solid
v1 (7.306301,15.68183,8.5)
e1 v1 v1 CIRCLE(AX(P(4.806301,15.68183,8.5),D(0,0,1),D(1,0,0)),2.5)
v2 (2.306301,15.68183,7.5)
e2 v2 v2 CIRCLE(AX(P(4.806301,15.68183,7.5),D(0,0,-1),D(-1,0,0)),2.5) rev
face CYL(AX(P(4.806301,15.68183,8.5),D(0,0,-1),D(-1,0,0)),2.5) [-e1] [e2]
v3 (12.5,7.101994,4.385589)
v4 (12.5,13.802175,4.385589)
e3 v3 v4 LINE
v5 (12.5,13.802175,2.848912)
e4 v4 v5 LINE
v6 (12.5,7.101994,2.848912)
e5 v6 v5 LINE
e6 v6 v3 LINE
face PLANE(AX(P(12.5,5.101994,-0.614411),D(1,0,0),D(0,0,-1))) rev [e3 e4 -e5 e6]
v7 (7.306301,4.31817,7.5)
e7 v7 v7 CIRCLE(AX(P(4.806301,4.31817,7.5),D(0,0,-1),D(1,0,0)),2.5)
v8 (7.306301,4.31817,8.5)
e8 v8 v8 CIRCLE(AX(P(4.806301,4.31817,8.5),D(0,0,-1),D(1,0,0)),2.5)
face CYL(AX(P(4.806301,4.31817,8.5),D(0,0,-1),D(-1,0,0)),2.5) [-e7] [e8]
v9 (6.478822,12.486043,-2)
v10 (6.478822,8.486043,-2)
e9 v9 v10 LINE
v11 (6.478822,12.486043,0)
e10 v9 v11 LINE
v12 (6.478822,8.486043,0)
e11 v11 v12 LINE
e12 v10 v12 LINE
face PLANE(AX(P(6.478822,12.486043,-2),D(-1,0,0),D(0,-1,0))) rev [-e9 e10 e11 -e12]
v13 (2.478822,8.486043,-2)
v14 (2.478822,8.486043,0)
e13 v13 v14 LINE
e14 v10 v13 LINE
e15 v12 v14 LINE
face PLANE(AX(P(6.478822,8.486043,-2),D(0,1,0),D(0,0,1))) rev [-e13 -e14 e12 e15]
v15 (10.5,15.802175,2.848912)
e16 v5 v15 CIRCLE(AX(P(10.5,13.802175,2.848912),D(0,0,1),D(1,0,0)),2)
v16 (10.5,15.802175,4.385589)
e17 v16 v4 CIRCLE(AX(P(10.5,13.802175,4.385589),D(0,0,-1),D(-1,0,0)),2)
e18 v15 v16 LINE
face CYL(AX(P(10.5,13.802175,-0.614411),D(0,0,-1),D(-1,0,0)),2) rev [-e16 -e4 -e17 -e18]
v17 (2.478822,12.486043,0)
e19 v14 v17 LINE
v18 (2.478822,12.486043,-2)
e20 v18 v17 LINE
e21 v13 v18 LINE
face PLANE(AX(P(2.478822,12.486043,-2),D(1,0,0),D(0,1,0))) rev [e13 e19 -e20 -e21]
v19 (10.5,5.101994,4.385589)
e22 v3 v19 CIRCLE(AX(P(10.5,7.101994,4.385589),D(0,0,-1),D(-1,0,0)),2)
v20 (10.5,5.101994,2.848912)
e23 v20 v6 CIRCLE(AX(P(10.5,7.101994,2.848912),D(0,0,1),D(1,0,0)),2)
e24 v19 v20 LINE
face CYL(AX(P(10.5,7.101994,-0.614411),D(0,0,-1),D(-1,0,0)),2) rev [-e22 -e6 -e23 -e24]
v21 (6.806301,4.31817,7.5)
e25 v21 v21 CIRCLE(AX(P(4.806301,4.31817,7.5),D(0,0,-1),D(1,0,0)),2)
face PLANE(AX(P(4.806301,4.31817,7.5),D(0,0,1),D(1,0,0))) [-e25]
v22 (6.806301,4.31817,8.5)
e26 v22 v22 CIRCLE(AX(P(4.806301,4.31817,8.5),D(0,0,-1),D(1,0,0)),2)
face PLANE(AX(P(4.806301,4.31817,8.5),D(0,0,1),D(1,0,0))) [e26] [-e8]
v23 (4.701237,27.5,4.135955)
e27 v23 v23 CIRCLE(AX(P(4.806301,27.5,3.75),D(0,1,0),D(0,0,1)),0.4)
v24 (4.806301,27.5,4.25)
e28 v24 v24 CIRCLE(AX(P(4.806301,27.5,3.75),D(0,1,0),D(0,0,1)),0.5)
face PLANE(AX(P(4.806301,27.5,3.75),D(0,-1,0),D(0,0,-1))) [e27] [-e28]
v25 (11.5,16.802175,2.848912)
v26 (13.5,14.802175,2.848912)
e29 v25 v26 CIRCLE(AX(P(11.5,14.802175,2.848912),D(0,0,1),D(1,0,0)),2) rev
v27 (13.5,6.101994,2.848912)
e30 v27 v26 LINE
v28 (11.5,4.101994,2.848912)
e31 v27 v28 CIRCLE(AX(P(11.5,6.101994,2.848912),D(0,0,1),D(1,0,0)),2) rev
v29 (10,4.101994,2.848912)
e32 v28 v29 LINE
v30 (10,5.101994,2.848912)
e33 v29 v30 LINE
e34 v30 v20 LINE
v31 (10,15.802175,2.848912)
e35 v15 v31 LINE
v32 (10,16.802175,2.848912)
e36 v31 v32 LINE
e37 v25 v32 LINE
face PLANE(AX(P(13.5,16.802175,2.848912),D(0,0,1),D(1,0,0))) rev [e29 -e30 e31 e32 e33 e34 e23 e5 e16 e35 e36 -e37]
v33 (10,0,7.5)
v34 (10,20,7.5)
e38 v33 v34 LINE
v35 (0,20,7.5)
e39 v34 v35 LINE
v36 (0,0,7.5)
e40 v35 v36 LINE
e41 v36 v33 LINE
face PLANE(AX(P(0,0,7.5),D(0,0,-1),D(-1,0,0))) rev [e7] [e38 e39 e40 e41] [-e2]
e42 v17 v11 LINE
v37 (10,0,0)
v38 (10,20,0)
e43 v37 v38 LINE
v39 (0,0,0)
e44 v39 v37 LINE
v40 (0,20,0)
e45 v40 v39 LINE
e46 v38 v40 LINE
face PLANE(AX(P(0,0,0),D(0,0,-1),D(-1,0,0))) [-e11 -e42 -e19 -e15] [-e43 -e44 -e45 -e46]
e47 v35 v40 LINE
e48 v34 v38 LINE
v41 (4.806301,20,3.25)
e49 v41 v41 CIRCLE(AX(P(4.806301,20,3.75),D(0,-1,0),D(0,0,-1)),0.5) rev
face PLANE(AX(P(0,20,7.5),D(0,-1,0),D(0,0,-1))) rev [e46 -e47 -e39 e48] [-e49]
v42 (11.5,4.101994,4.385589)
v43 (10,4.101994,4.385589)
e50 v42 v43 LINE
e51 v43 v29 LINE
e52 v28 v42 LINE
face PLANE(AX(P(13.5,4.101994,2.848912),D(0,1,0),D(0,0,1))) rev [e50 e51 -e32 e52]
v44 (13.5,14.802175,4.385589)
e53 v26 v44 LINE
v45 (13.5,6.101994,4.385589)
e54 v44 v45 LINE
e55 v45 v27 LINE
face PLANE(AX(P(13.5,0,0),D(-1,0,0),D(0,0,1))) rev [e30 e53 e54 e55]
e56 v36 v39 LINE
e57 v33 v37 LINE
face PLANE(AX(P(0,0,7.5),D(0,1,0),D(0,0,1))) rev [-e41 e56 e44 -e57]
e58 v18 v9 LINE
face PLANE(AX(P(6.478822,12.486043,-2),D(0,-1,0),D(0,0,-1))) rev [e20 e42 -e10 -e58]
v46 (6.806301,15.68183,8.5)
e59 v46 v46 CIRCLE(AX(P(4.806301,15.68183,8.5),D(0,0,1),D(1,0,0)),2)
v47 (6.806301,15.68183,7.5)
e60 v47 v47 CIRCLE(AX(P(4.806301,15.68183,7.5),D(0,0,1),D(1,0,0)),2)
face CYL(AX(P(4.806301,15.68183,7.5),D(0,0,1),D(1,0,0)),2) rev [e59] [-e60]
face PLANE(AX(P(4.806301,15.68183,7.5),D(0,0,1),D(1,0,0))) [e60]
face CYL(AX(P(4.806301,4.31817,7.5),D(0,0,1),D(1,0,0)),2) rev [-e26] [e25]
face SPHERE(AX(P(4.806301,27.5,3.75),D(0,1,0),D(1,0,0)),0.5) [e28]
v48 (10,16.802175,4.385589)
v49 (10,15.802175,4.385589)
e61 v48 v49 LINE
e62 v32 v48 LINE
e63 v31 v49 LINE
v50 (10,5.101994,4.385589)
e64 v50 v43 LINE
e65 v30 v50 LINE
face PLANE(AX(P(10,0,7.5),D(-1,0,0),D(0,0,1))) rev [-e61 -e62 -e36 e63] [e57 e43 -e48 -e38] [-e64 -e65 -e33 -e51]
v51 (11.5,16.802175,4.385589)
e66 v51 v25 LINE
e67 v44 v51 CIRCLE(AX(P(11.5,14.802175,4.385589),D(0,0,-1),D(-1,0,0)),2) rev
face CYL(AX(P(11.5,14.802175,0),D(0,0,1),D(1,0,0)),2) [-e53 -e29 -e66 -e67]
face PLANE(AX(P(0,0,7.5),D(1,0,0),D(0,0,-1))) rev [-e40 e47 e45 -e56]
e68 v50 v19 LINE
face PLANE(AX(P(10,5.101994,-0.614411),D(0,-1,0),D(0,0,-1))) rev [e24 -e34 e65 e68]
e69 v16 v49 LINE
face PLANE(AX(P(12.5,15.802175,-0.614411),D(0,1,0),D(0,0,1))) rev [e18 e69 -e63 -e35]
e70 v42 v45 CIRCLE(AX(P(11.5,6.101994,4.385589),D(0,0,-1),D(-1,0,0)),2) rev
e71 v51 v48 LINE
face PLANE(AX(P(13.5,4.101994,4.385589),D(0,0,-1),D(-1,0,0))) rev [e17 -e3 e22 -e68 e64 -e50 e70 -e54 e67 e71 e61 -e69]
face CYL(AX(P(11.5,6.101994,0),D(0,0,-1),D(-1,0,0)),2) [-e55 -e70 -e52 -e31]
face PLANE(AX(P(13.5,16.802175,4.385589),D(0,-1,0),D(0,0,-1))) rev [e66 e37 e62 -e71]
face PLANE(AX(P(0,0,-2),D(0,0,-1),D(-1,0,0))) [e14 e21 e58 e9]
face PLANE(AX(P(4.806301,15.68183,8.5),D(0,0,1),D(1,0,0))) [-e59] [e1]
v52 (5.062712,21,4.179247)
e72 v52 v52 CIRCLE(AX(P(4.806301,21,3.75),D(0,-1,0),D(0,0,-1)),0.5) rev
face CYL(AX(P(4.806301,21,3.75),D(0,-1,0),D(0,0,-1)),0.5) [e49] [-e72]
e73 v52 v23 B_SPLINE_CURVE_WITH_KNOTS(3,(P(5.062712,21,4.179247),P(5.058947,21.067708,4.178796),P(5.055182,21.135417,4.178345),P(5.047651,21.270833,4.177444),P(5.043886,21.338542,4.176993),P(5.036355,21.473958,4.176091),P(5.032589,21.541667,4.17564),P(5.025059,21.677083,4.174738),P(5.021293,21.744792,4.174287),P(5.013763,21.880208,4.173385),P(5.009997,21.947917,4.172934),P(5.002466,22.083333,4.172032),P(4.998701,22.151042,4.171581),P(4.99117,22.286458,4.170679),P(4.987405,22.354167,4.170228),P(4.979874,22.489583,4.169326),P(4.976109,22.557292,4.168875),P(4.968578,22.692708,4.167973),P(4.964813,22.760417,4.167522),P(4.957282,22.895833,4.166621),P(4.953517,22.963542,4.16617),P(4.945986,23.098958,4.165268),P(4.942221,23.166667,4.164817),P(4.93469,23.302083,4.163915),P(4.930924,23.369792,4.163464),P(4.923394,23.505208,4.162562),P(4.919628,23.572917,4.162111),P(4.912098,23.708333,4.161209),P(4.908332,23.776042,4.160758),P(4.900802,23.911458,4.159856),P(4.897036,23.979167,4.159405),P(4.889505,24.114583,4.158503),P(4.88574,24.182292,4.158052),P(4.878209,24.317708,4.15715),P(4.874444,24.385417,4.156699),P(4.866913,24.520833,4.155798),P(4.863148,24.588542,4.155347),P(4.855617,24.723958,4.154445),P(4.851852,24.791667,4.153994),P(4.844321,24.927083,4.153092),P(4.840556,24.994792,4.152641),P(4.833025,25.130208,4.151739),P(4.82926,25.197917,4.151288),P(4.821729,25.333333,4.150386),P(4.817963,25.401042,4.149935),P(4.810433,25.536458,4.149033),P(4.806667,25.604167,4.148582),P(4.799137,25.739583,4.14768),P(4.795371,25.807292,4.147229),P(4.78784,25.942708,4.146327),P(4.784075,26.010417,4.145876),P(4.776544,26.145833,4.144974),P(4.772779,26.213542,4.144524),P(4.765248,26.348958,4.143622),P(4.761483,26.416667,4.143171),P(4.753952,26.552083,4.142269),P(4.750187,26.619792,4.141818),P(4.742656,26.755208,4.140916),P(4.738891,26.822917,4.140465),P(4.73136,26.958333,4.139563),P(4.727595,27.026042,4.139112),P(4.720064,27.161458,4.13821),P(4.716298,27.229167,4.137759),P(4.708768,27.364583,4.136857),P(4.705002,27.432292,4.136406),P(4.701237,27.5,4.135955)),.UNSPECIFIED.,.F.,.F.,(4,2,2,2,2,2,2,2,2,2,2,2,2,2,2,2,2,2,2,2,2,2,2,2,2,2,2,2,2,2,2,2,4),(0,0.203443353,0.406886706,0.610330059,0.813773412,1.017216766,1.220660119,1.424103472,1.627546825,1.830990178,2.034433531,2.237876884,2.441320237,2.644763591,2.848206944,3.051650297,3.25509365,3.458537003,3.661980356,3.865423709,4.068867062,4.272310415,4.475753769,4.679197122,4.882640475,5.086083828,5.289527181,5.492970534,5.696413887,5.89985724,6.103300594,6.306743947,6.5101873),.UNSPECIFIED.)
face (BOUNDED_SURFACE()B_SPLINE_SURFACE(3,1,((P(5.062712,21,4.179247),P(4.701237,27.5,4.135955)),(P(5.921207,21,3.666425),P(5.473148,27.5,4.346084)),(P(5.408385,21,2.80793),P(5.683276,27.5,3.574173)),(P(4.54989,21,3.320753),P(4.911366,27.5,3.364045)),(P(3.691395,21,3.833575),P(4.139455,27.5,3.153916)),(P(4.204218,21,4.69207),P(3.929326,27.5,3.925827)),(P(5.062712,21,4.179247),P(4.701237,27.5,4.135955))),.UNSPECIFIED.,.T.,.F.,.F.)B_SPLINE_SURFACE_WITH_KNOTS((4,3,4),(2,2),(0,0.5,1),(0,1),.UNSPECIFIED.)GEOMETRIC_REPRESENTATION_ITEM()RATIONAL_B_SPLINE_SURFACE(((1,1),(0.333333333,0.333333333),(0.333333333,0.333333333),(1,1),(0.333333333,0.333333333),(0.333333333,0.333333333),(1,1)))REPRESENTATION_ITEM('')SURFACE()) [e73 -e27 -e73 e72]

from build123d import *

# Parameters (mm, degrees)
SKETCH1_W           = 10
SKETCH1_H           = 20
BOSS_EXTRUDE1_DEPTH = 7.5
SKETCH2_R           = 2.5
BOSS_EXTRUDE2_DEPTH = 1
SKETCH3_R           = 2
CUT_EXTRUDE1_DEPTH  = 1
SKETCH4_R           = 0.5
BOSS_EXTRUDE3_DEPTH = 1
SKETCH22_W          = 1.536676655
SKETCH22_H          = 12.700180583
BOSS_EXTRUDE4_DEPTH = 3.5
SKETCH25_W          = 2.5
SKETCH25_H          = 10.700180583
CUT_EXTRUDE4_DEPTH  = 5
FILLET1_R           = 2
FILLET2_R           = 2
FILLET3_R           = 2
FILLET4_R           = 2
SKETCH26_W          = 4
SKETCH26_H          = 4
BOSS_EXTRUDE5_DEPTH = 2


with BuildPart() as part:
    # Sketch1 → Boss-Extrude1 (new body)
    with BuildSketch(Plane.XY):
        with Locations((5, 10)):
            Rectangle(SKETCH1_W, SKETCH1_H)
    extrude(amount=BOSS_EXTRUDE1_DEPTH)

    # Sketch2 → Boss-Extrude2 (add)
    with BuildSketch(Plane.XY.offset(7.5)):
        with Locations(Location((4.806301262, 15.681829646, 0), (0, 0, 180))):
            Circle(SKETCH2_R)
    boss_extrude2 = extrude(amount=BOSS_EXTRUDE2_DEPTH)

    # Sketch3 → Cut-Extrude1 (cut)
    with BuildSketch(Plane.XY.offset(8.5)):
        with Locations((4.806301262, 15.681829646)):
            Circle(SKETCH3_R)
    cut_extrude1 = extrude(amount=-CUT_EXTRUDE1_DEPTH, mode=Mode.SUBTRACT)

    # Mirror1: Boss-Extrude2, Cut-Extrude1 across plane
    add(boss_extrude2.mirror(Plane.ZX.offset(10)))
    add(cut_extrude1.mirror(Plane.ZX.offset(10)), mode=Mode.SUBTRACT)

    # Sketch4 → Boss-Extrude3 (add)
    with BuildSketch(Plane(origin=(0, 20, 0), x_dir=(1, 0, 0), z_dir=(0, 1, 0))):
        with Locations(Location((4.806301262, -3.75, 0), (0, 0, 90))):
            Circle(SKETCH4_R)
    extrude(amount=BOSS_EXTRUDE3_DEPTH)

    # Loft1: read off the stored shape, not the designer's step
    # Loft1: loft between two sections, ruled curve by curve
    loft1_from = [
        Edge.make_bspline([(5.062712373, 21, 4.179247414), (5.921207201, 21, 3.666425193), (5.408384979, 21, 2.807930365), (4.549890151, 21, 3.320752586), (3.691395324, 21, 3.833574807), (4.204217545, 21, 4.692069635), (5.062712373, 21, 4.179247414)], [0, 0, 0, 0, 0.5, 0.5, 0.5, 1, 1, 1, 1], 3, [1, 0.333333333, 0.333333333, 1, 0.333333333, 0.333333333, 1]),
    ]
    loft1_to = [
        Edge.make_bspline([(4.701236965, 27.5, 4.1359553), (5.473147564, 27.5, 4.346083894), (5.683276159, 27.5, 3.574173295), (4.911365559, 27.5, 3.3640447), (4.13945496, 27.5, 3.153916106), (3.929326365, 27.5, 3.925826705), (4.701236965, 27.5, 4.1359553)], [0, 0, 0, 0, 0.5, 0.5, 0.5, 1, 1, 1, 1], 3, [1, 0.333333333, 0.333333333, 1, 0.333333333, 0.333333333, 1]),
    ]
    loft1 = Solid(Shell([*[Face.make_surface_from_curves(loft1_from[k], loft1_to[k]) for k in range(1)], Face(Wire(loft1_from)), Face(Wire(loft1_to))]))
    add(loft1)

    # Sketch20 → Revolve1 (revolve)
    with BuildSketch(Plane.XY.offset(3.75), mode=Mode.PRIVATE) as revolve1_sk:
        with BuildLine():
            Line((4.806301262, 28), (4.806301262, 27.5))
            Line((4.806301262, 27.5), (4.306301262, 27.5))
            ThreePointArc((4.306301262, 27.5), (4.452747871, 27.853553391), (4.806301262, 28))
        make_face()
    revolve(revolve1_sk.sketch.rotate(Axis((4.806301262, 28, 3.75), (0, -1, 0)), 180), axis=Axis((4.806301262, 28, 3.75), (0, -1, 0)))

    # Sketch22 → Boss-Extrude4 (add)
    with BuildSketch(Plane(origin=(10, 0, 0), x_dir=(0, 0, -1), z_dir=(1, 0, 0))):
        with Locations((-3.61725079, 10.452084784)):
            Rectangle(SKETCH22_W, SKETCH22_H)
    extrude(amount=BOSS_EXTRUDE4_DEPTH)

    # Sketch25 → Cut-Extrude4 (cut)
    with BuildSketch(Plane.XY.offset(4.385589117)):
        with Locations((11.25, 10.452084784)):
            Rectangle(SKETCH25_W, SKETCH25_H)
    extrude(amount=-CUT_EXTRUDE4_DEPTH, mode=Mode.SUBTRACT)

    # Fillet1
    fillet1_edges = [part.edges().sort_by_distance(p)[0] for p in [
        (13.5, 16.802175075, 3.617250789),
    ]]
    fillet(fillet1_edges, radius=FILLET1_R)

    # Fillet2
    fillet2_edges = [part.edges().sort_by_distance(p)[0] for p in [
        (12.5, 15.802175075, 3.617250789),
    ]]
    fillet(fillet2_edges, radius=FILLET2_R)

    # Fillet3
    fillet3_edges = [part.edges().sort_by_distance(p)[0] for p in [
        (13.5, 4.101994492, 3.617250789),
    ]]
    fillet(fillet3_edges, radius=FILLET3_R)

    # Fillet4
    fillet4_edges = [part.edges().sort_by_distance(p)[0] for p in [
        (12.5, 5.101994492, 3.617250789),
    ]]
    fillet(fillet4_edges, radius=FILLET4_R)

    # Sketch26 → Boss-Extrude5 (add)
    with BuildSketch(Plane(origin=(0, 0, 0), x_dir=(-1, 0, 0), z_dir=(0, 0, -1))):
        with Locations((-4.478821767, 10.486042594)):
            Rectangle(SKETCH26_W, SKETCH26_H)
    extrude(amount=BOSS_EXTRUDE5_DEPTH)


solid = part.part
